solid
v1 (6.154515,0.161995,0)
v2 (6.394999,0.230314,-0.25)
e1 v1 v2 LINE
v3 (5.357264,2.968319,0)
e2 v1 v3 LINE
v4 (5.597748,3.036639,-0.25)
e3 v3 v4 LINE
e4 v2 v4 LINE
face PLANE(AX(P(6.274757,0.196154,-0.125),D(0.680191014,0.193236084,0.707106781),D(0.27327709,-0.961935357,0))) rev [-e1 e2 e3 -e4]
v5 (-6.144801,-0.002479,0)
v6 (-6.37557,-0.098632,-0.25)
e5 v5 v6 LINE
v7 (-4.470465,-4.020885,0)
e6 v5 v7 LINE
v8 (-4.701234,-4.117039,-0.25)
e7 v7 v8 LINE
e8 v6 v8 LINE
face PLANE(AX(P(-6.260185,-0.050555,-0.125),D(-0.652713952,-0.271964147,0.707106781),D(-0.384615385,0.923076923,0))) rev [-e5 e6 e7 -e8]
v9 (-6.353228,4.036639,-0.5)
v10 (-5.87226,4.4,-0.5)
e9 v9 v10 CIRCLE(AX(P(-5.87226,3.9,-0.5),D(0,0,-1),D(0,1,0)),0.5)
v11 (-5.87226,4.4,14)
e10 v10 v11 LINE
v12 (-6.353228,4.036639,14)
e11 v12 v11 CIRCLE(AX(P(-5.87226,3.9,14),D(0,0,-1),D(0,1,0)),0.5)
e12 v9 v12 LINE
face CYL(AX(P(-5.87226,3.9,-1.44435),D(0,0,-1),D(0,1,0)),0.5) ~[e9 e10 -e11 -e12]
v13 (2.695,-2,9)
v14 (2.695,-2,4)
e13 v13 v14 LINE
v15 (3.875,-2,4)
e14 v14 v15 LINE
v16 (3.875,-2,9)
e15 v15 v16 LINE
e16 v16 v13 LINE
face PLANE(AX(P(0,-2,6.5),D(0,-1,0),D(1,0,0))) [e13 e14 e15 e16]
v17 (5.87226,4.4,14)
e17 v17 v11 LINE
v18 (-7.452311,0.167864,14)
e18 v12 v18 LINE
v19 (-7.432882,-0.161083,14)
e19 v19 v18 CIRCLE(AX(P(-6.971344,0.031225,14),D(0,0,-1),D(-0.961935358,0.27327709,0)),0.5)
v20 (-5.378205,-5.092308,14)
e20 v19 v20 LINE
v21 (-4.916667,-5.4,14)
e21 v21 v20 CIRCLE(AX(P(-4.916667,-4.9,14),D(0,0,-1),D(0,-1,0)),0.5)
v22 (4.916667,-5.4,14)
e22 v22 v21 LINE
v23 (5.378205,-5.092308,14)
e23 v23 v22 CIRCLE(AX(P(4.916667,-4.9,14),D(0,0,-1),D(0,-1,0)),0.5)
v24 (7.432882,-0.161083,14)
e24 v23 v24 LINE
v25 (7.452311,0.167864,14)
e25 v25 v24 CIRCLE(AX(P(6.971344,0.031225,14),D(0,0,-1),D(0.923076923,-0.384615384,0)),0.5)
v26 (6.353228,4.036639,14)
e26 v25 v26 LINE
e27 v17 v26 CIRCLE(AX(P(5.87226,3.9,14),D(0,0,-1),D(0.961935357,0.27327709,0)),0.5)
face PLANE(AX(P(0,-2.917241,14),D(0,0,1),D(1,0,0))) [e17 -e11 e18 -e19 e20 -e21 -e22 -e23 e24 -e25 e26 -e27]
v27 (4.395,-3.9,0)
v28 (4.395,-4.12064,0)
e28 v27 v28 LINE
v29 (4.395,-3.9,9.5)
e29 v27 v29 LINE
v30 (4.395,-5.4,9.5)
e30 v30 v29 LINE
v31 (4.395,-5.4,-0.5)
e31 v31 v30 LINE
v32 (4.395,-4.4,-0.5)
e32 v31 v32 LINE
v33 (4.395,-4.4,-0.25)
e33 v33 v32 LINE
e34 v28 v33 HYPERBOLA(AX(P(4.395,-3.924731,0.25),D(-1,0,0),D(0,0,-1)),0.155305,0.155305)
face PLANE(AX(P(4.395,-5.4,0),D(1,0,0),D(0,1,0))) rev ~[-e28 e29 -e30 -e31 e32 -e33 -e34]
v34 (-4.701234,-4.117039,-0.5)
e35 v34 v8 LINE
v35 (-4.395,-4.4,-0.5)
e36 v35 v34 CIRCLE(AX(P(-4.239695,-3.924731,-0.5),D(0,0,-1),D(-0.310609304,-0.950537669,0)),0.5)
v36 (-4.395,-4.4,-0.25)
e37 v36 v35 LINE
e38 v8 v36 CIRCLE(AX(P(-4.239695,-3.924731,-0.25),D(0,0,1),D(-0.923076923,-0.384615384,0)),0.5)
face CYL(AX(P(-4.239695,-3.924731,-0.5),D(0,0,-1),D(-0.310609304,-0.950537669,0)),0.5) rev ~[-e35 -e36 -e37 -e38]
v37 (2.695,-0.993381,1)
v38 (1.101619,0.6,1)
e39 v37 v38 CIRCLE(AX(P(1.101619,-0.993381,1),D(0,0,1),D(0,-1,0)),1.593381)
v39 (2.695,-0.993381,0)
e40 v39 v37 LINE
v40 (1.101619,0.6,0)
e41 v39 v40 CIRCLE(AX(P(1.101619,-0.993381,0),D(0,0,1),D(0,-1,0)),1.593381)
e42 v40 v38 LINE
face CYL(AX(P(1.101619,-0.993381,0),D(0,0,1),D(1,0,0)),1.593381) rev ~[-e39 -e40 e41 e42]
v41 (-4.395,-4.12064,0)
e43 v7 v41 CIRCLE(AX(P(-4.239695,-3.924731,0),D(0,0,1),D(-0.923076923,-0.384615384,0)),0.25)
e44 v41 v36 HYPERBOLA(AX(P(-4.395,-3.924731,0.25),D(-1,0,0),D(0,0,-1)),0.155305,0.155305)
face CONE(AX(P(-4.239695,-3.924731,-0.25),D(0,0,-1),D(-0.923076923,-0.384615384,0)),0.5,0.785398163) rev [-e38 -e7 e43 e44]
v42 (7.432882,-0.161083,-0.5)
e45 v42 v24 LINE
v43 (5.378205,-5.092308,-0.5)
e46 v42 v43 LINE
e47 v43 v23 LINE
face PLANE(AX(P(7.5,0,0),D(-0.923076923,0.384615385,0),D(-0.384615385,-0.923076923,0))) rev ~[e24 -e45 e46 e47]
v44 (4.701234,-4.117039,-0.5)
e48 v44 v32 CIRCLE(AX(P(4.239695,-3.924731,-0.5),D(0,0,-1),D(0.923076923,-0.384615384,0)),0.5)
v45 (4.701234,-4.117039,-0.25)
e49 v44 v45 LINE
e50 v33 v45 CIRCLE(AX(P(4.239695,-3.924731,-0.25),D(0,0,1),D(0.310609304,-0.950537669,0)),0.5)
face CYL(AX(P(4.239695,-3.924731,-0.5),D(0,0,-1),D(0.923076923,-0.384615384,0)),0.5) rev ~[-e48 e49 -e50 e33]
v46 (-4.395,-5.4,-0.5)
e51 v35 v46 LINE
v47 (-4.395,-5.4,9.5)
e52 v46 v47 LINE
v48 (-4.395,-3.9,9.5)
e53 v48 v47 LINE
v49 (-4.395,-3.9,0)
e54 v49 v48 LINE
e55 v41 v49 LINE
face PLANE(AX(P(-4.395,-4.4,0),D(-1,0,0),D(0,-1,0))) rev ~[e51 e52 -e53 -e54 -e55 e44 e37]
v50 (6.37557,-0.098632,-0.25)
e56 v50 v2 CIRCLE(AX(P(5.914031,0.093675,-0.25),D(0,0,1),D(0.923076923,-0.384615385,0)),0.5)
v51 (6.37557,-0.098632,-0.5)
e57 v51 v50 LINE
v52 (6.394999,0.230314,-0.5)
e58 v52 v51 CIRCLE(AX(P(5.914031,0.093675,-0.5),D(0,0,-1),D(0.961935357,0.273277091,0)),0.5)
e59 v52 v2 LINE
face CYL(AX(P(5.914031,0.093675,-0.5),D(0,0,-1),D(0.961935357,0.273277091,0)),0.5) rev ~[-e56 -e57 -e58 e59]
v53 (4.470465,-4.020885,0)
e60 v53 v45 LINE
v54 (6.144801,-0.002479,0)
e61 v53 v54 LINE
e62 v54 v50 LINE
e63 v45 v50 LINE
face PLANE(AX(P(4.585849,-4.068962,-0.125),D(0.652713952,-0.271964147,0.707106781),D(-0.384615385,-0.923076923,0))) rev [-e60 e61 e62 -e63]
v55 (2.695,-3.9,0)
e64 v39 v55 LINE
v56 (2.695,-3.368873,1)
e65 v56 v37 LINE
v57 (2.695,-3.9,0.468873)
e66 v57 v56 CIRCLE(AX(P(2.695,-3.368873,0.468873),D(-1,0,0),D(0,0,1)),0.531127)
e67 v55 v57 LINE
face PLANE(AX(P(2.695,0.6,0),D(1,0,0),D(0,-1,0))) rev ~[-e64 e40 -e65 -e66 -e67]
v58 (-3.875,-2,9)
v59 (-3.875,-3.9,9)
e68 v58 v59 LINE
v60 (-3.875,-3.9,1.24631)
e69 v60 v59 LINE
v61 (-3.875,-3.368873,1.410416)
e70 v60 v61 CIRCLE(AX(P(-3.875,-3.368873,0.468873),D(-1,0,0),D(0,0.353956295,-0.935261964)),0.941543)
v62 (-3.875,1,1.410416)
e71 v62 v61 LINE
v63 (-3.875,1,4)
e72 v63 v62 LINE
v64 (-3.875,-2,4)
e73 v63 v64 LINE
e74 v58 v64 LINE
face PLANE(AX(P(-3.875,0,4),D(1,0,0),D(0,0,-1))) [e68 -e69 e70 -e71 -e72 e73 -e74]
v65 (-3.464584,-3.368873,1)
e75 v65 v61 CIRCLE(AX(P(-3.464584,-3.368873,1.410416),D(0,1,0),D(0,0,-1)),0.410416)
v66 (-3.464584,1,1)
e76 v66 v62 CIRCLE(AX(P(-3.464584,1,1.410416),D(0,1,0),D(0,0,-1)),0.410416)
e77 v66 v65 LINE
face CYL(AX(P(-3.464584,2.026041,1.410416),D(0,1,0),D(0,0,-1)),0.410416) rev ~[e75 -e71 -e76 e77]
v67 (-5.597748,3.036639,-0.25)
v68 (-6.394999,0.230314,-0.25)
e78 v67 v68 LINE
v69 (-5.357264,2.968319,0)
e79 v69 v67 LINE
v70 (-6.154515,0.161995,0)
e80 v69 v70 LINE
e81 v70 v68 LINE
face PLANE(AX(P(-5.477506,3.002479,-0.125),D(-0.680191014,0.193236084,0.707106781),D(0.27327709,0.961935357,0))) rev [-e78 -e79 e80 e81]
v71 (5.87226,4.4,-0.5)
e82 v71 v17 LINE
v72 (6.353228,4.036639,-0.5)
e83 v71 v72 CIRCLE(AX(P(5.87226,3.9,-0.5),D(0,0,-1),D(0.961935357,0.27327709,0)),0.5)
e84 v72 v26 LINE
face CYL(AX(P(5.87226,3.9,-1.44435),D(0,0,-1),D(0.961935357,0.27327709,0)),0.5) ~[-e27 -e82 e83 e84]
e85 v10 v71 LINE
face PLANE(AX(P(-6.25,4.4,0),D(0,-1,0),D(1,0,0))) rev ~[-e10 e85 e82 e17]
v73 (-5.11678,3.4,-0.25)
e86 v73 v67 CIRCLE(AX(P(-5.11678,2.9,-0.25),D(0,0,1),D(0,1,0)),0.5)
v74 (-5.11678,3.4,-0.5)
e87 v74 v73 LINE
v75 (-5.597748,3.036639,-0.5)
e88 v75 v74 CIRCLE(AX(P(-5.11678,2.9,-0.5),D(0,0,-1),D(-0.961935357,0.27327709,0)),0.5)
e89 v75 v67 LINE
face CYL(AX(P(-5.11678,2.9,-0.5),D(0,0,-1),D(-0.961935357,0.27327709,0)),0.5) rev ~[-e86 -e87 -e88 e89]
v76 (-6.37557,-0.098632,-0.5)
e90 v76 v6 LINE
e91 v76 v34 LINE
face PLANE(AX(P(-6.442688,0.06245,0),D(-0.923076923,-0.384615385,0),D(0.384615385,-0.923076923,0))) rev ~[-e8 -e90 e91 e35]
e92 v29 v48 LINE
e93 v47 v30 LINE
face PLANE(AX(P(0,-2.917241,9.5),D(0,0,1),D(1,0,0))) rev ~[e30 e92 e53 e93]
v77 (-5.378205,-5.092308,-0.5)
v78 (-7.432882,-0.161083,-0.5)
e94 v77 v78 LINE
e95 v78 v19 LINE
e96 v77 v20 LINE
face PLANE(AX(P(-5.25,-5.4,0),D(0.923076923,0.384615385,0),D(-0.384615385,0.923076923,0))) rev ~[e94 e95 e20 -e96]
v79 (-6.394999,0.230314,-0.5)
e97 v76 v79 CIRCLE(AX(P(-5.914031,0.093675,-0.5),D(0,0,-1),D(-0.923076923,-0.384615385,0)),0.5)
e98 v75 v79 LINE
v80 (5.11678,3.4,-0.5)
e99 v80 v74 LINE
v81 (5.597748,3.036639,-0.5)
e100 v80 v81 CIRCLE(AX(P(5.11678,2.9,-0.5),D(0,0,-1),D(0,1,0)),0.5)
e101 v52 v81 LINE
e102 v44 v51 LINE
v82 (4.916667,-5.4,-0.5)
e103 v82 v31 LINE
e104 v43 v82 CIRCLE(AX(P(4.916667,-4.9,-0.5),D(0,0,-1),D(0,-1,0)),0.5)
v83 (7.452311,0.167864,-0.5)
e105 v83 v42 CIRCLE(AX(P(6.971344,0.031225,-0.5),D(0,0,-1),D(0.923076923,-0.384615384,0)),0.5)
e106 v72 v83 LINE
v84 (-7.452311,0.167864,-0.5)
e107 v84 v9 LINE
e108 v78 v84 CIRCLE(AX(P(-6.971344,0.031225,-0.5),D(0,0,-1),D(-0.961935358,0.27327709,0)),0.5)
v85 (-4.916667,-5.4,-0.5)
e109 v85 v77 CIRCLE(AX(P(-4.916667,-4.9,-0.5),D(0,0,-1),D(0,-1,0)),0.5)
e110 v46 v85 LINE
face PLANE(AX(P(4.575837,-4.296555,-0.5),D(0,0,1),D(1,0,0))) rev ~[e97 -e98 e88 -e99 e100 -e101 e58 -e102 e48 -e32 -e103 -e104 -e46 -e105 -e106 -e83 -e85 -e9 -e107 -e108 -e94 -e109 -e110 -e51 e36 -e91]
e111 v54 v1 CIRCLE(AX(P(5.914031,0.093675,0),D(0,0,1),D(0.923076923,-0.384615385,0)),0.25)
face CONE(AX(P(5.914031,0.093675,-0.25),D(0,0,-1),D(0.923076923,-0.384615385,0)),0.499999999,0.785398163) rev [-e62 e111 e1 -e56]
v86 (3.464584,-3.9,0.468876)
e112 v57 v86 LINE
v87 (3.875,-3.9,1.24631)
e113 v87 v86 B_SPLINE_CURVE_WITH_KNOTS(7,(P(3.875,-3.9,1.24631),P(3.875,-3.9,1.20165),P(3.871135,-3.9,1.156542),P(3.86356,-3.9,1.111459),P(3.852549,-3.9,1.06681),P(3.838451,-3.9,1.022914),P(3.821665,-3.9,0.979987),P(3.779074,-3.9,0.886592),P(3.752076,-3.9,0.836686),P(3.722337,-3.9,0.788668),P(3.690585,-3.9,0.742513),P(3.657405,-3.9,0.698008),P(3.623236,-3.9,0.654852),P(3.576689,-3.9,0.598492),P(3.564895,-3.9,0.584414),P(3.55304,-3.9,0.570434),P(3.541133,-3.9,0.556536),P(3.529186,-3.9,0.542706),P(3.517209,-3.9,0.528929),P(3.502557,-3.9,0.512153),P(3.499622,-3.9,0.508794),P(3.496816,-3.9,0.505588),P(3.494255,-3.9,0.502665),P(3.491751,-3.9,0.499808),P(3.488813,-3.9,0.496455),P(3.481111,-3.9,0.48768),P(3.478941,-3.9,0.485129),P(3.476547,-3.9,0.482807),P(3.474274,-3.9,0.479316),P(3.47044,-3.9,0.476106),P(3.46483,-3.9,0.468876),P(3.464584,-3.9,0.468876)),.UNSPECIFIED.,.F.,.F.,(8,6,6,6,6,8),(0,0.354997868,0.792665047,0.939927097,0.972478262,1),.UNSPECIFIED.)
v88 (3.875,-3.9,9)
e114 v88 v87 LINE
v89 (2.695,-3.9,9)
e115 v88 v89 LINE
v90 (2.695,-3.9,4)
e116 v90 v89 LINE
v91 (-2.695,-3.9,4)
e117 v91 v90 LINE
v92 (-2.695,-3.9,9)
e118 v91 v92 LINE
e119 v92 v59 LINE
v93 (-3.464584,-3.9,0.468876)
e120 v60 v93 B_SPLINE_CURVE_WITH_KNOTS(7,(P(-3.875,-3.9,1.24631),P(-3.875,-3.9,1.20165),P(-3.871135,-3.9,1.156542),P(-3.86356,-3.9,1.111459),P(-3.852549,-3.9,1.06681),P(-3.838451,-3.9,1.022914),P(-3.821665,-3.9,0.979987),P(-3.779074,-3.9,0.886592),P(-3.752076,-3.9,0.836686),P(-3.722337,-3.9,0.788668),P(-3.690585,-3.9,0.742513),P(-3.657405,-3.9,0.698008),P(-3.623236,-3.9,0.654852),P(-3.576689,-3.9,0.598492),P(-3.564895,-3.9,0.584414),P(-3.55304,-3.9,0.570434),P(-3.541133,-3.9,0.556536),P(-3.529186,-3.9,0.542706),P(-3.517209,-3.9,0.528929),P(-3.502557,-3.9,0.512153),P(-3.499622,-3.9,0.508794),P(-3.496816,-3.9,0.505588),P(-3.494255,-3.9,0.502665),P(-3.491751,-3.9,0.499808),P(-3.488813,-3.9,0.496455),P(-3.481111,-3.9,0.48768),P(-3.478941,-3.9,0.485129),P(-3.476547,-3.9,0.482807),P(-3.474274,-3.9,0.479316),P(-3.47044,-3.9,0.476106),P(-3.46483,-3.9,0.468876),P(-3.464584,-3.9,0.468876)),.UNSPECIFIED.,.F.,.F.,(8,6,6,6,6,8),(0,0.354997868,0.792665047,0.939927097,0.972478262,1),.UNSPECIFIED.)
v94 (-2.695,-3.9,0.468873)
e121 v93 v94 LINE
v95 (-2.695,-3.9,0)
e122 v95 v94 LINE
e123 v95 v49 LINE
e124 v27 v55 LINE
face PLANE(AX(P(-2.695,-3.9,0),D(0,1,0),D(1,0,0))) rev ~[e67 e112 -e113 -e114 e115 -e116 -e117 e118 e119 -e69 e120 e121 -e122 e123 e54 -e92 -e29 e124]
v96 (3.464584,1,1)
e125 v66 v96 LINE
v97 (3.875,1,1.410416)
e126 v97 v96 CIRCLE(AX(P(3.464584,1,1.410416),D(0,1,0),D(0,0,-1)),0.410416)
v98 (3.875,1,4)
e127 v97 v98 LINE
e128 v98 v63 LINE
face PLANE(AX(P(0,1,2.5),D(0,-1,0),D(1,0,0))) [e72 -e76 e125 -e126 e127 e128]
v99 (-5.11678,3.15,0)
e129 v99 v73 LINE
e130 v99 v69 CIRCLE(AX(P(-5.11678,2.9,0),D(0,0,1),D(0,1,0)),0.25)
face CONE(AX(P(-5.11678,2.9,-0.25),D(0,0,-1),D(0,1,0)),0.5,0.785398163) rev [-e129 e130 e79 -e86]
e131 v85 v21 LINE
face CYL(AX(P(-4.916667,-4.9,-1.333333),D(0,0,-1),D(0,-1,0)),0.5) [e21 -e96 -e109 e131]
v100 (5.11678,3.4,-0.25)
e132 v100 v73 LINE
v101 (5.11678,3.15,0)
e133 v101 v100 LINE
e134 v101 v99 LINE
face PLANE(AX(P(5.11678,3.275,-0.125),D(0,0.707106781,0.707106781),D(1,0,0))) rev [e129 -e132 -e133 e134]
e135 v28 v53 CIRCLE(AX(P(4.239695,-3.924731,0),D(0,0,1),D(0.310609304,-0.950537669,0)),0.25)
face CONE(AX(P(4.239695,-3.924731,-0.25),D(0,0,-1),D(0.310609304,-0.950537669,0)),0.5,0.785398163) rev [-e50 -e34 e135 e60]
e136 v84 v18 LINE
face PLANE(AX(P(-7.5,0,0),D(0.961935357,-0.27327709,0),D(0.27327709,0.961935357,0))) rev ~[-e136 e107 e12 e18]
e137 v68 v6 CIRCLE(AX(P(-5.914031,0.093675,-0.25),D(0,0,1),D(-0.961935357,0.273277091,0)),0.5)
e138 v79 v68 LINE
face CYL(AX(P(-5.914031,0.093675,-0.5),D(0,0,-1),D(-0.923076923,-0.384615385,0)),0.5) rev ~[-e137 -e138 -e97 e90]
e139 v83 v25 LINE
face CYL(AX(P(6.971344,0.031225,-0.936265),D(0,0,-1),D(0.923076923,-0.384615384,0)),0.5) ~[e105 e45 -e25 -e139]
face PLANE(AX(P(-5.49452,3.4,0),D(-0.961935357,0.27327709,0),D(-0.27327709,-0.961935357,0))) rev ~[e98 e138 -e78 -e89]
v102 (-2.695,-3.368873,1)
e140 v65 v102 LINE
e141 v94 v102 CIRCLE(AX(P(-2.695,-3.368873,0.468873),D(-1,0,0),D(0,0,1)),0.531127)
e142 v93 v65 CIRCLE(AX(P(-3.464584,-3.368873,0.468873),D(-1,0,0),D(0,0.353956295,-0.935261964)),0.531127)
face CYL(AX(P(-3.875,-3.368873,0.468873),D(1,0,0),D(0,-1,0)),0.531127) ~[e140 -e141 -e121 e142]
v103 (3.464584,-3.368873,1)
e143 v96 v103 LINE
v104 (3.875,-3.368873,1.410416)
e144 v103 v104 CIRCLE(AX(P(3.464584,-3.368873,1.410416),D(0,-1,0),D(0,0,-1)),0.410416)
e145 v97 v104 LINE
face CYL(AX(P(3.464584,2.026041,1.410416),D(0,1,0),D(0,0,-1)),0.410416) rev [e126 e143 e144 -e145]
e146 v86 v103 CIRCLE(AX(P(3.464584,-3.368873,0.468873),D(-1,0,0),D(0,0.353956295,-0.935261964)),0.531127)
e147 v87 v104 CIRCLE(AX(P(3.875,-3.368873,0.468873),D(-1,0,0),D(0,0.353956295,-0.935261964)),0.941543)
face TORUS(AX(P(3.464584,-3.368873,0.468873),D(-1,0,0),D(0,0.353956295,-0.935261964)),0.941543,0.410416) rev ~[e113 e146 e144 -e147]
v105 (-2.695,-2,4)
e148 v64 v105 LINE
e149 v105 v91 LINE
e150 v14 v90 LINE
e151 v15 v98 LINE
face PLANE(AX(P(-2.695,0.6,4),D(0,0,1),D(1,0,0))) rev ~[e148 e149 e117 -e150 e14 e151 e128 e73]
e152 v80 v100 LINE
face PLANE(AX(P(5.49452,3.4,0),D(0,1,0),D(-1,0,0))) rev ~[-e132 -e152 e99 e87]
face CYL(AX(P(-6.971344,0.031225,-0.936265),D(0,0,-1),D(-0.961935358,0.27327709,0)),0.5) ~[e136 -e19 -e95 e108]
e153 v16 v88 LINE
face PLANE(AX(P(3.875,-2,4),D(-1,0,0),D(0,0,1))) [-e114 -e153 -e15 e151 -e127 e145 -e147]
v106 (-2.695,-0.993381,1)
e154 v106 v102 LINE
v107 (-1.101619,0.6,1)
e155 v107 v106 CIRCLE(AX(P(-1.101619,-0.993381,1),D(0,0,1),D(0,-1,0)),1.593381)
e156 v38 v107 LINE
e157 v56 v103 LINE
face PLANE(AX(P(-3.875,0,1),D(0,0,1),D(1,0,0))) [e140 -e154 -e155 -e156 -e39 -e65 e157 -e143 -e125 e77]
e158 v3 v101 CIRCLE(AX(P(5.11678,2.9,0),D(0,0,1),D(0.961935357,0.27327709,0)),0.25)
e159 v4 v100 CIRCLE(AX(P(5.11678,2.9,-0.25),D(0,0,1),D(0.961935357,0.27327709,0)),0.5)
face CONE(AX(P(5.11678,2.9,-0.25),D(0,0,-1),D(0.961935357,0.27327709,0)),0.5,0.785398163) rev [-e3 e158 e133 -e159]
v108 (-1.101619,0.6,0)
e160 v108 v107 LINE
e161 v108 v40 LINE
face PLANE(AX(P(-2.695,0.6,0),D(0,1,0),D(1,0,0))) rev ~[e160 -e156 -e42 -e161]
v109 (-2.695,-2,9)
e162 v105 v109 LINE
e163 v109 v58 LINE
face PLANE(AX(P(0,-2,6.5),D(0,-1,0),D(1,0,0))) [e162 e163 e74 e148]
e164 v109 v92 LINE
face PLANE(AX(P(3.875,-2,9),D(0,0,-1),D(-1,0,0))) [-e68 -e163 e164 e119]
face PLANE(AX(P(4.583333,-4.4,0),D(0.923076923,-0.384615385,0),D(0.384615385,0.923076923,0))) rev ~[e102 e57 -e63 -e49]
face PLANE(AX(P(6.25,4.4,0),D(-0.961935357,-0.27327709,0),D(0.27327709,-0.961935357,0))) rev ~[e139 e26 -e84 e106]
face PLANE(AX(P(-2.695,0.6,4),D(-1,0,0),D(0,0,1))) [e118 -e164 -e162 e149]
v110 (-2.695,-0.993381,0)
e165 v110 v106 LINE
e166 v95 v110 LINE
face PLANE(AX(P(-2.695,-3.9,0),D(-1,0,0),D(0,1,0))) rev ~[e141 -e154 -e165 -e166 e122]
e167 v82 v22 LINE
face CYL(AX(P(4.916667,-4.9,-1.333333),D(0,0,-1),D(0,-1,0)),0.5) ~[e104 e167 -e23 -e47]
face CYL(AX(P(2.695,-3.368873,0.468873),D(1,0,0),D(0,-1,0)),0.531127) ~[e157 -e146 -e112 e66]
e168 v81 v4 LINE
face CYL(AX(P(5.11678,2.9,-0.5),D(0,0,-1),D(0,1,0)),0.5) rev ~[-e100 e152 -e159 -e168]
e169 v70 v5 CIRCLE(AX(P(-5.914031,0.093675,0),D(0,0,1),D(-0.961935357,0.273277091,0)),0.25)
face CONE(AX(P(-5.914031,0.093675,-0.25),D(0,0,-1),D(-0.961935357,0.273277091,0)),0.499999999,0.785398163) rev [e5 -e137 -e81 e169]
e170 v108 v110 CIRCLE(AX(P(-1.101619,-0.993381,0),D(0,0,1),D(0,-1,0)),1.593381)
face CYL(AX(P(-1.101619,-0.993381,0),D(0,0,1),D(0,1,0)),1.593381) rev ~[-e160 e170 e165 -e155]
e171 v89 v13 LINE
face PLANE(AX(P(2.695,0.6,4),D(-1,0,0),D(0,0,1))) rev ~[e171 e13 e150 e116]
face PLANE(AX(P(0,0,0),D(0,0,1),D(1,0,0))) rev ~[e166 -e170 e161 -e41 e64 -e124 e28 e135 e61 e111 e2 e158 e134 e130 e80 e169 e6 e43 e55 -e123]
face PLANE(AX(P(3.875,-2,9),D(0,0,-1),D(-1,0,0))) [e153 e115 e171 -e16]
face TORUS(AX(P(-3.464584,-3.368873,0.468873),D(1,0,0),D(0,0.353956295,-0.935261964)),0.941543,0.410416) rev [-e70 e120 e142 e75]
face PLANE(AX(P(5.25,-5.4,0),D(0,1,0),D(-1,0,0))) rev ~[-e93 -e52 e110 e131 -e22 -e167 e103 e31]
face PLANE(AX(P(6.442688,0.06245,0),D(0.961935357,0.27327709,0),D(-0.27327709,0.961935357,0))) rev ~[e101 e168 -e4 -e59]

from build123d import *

# Parameters (mm, degrees)
F1_DEPTH      = 14
F3_START      = 2
F3_DEPTH      = 9.7
F4_DEPTH      = 1
F4_DEPTH_BACK = 22
F5_START      = 9.5
F5_DEPTH      = 4.5
F6_DEPTH      = 4.5
F8_DEPTH      = 0.5
F9_R          = 1.5933809512
F10_R         = 0.5311269837
F11_T1_DEPTH  = 5.3949137803
F11_T6_ANGLE  = 200.7294916834
F11_T12_ANGLE = 200.7294916834
F12_T1_DEPTH  = 1.2663530932
F12_T3_DEPTH  = 0.9362653772
F12_T5_DEPTH  = 1.4443499817
F12_T7_DEPTH  = 1.4443499817
F12_T9_DEPTH  = 0.9362653772
F12_T11_DEPTH = 1.2663530932
F12_T13_DEPTH = 16.1666666667
F12_T15_DEPTH = 16.1666666667
F12_T17_DEPTH = 15.3725307543
F12_T19_DEPTH = 16.3886999634
F12_T21_DEPTH = 16.3886999634
F12_T23_DEPTH = 15.3725307543
F13_SIZE      = 0.25


# Not quite as in the source:
# - a fillet or chamfer that OpenCascade refuses, or shapes differently, is made with other operations: its cross-section is extruded or revolved along the edge and cut away or added


with BuildPart() as f1:
    # F0 (on Top) → F1 (new body)
    with BuildSketch(Plane.XY):
        Polygon((6.25, 4.4), (0, 4.4), (-6.25, 4.4), (-7.5, 0), (-5.25, -5.4), (-4.395, -5.4), (-4.395, -3.9), (-2.695, -3.9), (-2.695, 0.6), (0, 0.6), (2.695, 0.6), (2.695, -3.9), (4.395, -3.9), (4.395, -5.4), (5.25, -5.4), (7.5, 0), align=None)
    extrude(amount=F1_DEPTH)

    # F2 (on Front) → F3 (cut)
    with BuildSketch(Plane.XZ.offset(F3_START)):
        Polygon((0, 4), (3.875, 4), (3.875, 9), (0, 9), (-3.875, 9), (-3.875, 4), align=None)
    extrude(amount=F3_DEPTH, mode=Mode.SUBTRACT)

    # F2 (on Front) → F4 (cut, two sides)
    with BuildSketch(Plane.XZ) as f4_sk:
        Polygon((-3.875, 1), (0, 1), (3.875, 1), (3.875, 4), (0, 4), (-3.875, 4), align=None)
    extrude(amount=-F4_DEPTH, mode=Mode.SUBTRACT)
    extrude(f4_sk.sketch, amount=F4_DEPTH_BACK, mode=Mode.SUBTRACT)

    # F0 (on Top) → F5 (join)
    with BuildSketch(Plane.XY.offset(F5_START)):
        Polygon((0, -5.4), (4.395, -5.4), (4.395, -3.9), (2.695, -3.9), (2.695, 0.6), (0, 0.6), (-2.695, 0.6), (-2.695, -3.9), (-4.395, -3.9), (-4.395, -5.4), align=None)
    extrude(amount=F5_DEPTH)

    # F6 (add): a face of the model
    f6_faces = [f1.faces().sort_by_distance(p)[0] for p in [
        (0, 0.6, 6.75),
    ]]
    extrude(f6_faces, amount=F6_DEPTH)

    # F7 (on face) → F8 (join)
    with BuildSketch(Plane(origin=(0, 0, 0), x_dir=(1, 0, 0), z_dir=(0, 0, -1))):
        Polygon((4.395, 5.4), (4.395, 4.4), (4.5833333333, 4.4), (6.4426875763, -0.062450183), (5.4945200146, -3.4), (-5.4945200146, -3.4), (-6.4426875763, -0.062450183), (-4.5833333333, 4.4), (-4.395, 4.4), (-4.395, 5.4), (-5.25, 5.4), (-7.5, 0), (-6.25, -4.4), (6.25, -4.4), (7.5, 0), (5.25, 5.4), align=None)
    extrude(amount=F8_DEPTH)

    # F9
    f9_edges = [f1.edges().sort_by_distance(p)[0] for p in [
        (2.695, 0.6, 0.5),
        (-2.695, 0.6, 0.5),
    ]]
    fillet(f9_edges, radius=F9_R)

    # F10
    f10_edges = [f1.edges().sort_by_distance(p)[0] for p in [
        (-3.285, -3.9, 1),
        (3.285, -3.9, 1),
    ]]
    fillet(f10_edges, radius=F10_R)

    # F11: fillet of radius 0.4104163056 on 2 edges, made by hand

    # F11_s2 → F11_t1 (join)
    with BuildSketch(Plane.XZ.offset(-2.026040764)):
        with BuildLine():
            ThreePointArc((3.4645836944, 1), (3.7547918472, 1.1202081528), (3.875, 1.4104163056))
            Line((3.875, 1.4104163056), (3.875, 1))
            Line((3.875, 1), (3.4645836944, 1))
        make_face()
        with BuildLine():
            ThreePointArc((-3.4645836944, 1), (-3.7547918472, 1.1202081528), (-3.875, 1.4104163056))
            Line((-3.875, 1.4104163056), (-3.875, 1))
            Line((-3.875, 1), (-3.4645836944, 1))
        make_face()
    extrude(amount=F11_T1_DEPTH)


with BuildPart() as f11_tool4:
    # F11_s5 → F11_t6 (revolve)
    with BuildSketch(Plane(origin=(0, -2.7915869666, -1.0564952052), x_dir=(1, 0, 0), z_dir=(0, 0.9352619639, 0.3539562952))):
        with BuildLine():
            ThreePointArc((-3.4645836944, -1.0998259262), (-3.7547918472, -0.9796177734), (-3.875, -0.6894096206))
            Line((-3.875, -0.6894096206), (-3.875, -1.0998259262))
            Line((-3.875, -1.0998259262), (-3.4645836944, -1.0998259262))
        make_face()
    revolve(axis=Axis((-3.875, -3.3688730163, 0.4688730163), (-1, 0, 0)), revolution_arc=F11_T6_ANGLE)

    split(bisect_by=Plane.XZ.offset(3.9), keep=Keep.BOTTOM)

    split(bisect_by=Plane.XY, keep=Keep.TOP)


with BuildPart() as f1_1:
    add(f1.part)

    # F11_t3: union F11_tool4
    add(f11_tool4.part)


with BuildPart() as f11_tool10:
    # F11_s11 → F11_t12 (revolve)
    with BuildSketch(Plane(origin=(0, -2.7915869666, -1.0564952052), x_dir=(1, 0, 0), z_dir=(0, 0.9352619639, 0.3539562952))):
        with BuildLine():
            ThreePointArc((3.4645836944, -1.0998259262), (3.7547918472, -0.9796177734), (3.875, -0.6894096206))
            Line((3.875, -0.6894096206), (3.875, -1.0998259262))
            Line((3.875, -1.0998259262), (3.4645836944, -1.0998259262))
        make_face()
    revolve(axis=Axis((3.875, -3.3688730163, 0.4688730163), (-1, 0, 0)), revolution_arc=F11_T12_ANGLE)

    split(bisect_by=Plane.XZ.offset(3.9), keep=Keep.BOTTOM)

    split(bisect_by=Plane.XY, keep=Keep.TOP)


with BuildPart() as f1_2:
    add(f1_1.part)

    # F11_t9: union F11_tool10
    add(f11_tool10.part)

    # F12: fillet of radius 0.5 on 12 edges, made by hand

    # F12_s2 → F12_t1 (join)
    with BuildSketch(Plane.XY.offset(-0.5)):
        with BuildLine():
            ThreePointArc((-4.395, -4.4), (-4.5790190998, -4.2919632329), (-4.7012338092, -4.1170388579))
            Line((-4.7012338092, -4.1170388579), (-4.5833333333, -4.4))
            Line((-4.5833333333, -4.4), (-4.395, -4.4))
        make_face()
    extrude(amount=F12_T1_DEPTH)

    # F12_s4 → F12_t3 (join)
    with BuildSketch(Plane.XY.offset(-0.5)):
        with BuildLine():
            ThreePointArc((-6.3755698259, -0.0986324178), (-6.4131614706, 0.0641941432), (-6.3949990431, 0.2303138196))
            Line((-6.3949990431, 0.2303138196), (-6.4426875763, 0.062450183))
            Line((-6.4426875763, 0.062450183), (-6.3755698259, -0.0986324178))
        make_face()
    extrude(amount=F12_T3_DEPTH)

    # F12_s6 → F12_t5 (join)
    with BuildSketch(Plane.XY.offset(-0.5)):
        with BuildLine():
            ThreePointArc((-5.5977477007, 3.0366385451), (-5.4181773738, 3.2989481624), (-5.1167800219, 3.4))
            Line((-5.1167800219, 3.4), (-5.4945200146, 3.4))
            Line((-5.4945200146, 3.4), (-5.5977477007, 3.0366385451))
        make_face()
    extrude(amount=F12_T5_DEPTH)

    # F12_s8 → F12_t7 (join)
    with BuildSketch(Plane.XY.offset(-0.5)):
        with BuildLine():
            ThreePointArc((5.1167800219, 3.4), (5.4181773738, 3.2989481624), (5.5977477007, 3.0366385451))
            Line((5.5977477007, 3.0366385451), (5.4945200146, 3.4))
            Line((5.4945200146, 3.4), (5.1167800219, 3.4))
        make_face()
    extrude(amount=F12_T7_DEPTH)

    # F12_s10 → F12_t9 (join)
    with BuildSketch(Plane.XY.offset(-0.5)):
        with BuildLine():
            ThreePointArc((6.3949990431, 0.2303138196), (6.4131614706, 0.0641941432), (6.3755698259, -0.0986324178))
            Line((6.3755698259, -0.0986324178), (6.4426875763, 0.062450183))
            Line((6.4426875763, 0.062450183), (6.3949990431, 0.2303138196))
        make_face()
    extrude(amount=F12_T9_DEPTH)

    # F12_s12 → F12_t11 (join)
    with BuildSketch(Plane.XY.offset(-0.5)):
        with BuildLine():
            ThreePointArc((4.7012338092, -4.1170388579), (4.5790190998, -4.2919632329), (4.395, -4.4))
            Line((4.395, -4.4), (4.5833333333, -4.4))
            Line((4.5833333333, -4.4), (4.7012338092, -4.1170388579))
        make_face()
    extrude(amount=F12_T11_DEPTH)

    # F12_s14 → F12_t13 (cut)
    with BuildSketch(Plane.XY.offset(-1.3333333333)):
        with BuildLine():
            ThreePointArc((-4.9166666667, -5.4), (-5.1940167648, -5.3160251472), (-5.3782051282, -5.0923076923))
            Line((-5.3782051282, -5.0923076923), (-5.25, -5.4))
            Line((-5.25, -5.4), (-4.9166666667, -5.4))
        make_face()
    extrude(amount=F12_T13_DEPTH, mode=Mode.SUBTRACT)

    # F12_s16 → F12_t15 (cut)
    with BuildSketch(Plane.XY.offset(-1.3333333333)):
        with BuildLine():
            ThreePointArc((4.9166666667, -5.4), (5.1940167648, -5.3160251472), (5.3782051282, -5.0923076923))
            Line((5.3782051282, -5.0923076923), (5.25, -5.4))
            Line((5.25, -5.4), (4.9166666667, -5.4))
        make_face()
    extrude(amount=F12_T15_DEPTH, mode=Mode.SUBTRACT)

    # F12_s18 → F12_t17 (cut)
    with BuildSketch(Plane.XY.offset(-0.9362653772)):
        with BuildLine():
            ThreePointArc((7.4328822497, -0.1610826008), (7.4704738943, 0.0017439601), (7.4523114669, 0.1678636366))
            Line((7.4523114669, 0.1678636366), (7.5, 0))
            Line((7.5, 0), (7.4328822497, -0.1610826008))
        make_face()
    extrude(amount=F12_T17_DEPTH, mode=Mode.SUBTRACT)

    # F12_s20 → F12_t19 (cut)
    with BuildSketch(Plane.XY.offset(-1.4443499817)):
        with BuildLine():
            ThreePointArc((6.3532276861, 4.0366385451), (6.1736573592, 4.2989481624), (5.8722600073, 4.4))
            Line((5.8722600073, 4.4), (6.25, 4.4))
            Line((6.25, 4.4), (6.3532276861, 4.0366385451))
        make_face()
    extrude(amount=F12_T19_DEPTH, mode=Mode.SUBTRACT)

    # F12_s22 → F12_t21 (cut)
    with BuildSketch(Plane.XY.offset(-1.4443499817)):
        with BuildLine():
            ThreePointArc((-5.8722600073, 4.4), (-6.1736573592, 4.2989481624), (-6.3532276861, 4.0366385451))
            Line((-6.3532276861, 4.0366385451), (-6.25, 4.4))
            Line((-6.25, 4.4), (-5.8722600073, 4.4))
        make_face()
    extrude(amount=F12_T21_DEPTH, mode=Mode.SUBTRACT)

    # F12_s24 → F12_t23 (cut)
    with BuildSketch(Plane.XY.offset(-0.9362653772)):
        with BuildLine():
            ThreePointArc((-7.4523114669, 0.1678636366), (-7.4704738943, 0.0017439601), (-7.4328822497, -0.1610826008))
            Line((-7.4328822497, -0.1610826008), (-7.5, 0))
            Line((-7.5, 0), (-7.4523114669, 0.1678636366))
        make_face()
    extrude(amount=F12_T23_DEPTH, mode=Mode.SUBTRACT)

    # F13
    f13_edges = [f1_2.edges().sort_by_distance(p)[0] for p in [
        (-5.996373, 1.633476, 0),
        (-5.418177, 3.298948, 0),
        (-6.413161, 0.064194, 0),
        (-5.538402, -2.107836, 0),
        (-4.579019, -4.291963, 0),
        (4.579019, -4.291963, 0),
        (5.538402, -2.107836, 0),
        (6.413161, 0.064194, 0),
        (5.996373, 1.633476, 0),
        (5.418177, 3.298948, 0),
        (0, 3.4, 0),
    ]]
    chamfer(f13_edges, length=F13_SIZE)


solid = f1_2.part
